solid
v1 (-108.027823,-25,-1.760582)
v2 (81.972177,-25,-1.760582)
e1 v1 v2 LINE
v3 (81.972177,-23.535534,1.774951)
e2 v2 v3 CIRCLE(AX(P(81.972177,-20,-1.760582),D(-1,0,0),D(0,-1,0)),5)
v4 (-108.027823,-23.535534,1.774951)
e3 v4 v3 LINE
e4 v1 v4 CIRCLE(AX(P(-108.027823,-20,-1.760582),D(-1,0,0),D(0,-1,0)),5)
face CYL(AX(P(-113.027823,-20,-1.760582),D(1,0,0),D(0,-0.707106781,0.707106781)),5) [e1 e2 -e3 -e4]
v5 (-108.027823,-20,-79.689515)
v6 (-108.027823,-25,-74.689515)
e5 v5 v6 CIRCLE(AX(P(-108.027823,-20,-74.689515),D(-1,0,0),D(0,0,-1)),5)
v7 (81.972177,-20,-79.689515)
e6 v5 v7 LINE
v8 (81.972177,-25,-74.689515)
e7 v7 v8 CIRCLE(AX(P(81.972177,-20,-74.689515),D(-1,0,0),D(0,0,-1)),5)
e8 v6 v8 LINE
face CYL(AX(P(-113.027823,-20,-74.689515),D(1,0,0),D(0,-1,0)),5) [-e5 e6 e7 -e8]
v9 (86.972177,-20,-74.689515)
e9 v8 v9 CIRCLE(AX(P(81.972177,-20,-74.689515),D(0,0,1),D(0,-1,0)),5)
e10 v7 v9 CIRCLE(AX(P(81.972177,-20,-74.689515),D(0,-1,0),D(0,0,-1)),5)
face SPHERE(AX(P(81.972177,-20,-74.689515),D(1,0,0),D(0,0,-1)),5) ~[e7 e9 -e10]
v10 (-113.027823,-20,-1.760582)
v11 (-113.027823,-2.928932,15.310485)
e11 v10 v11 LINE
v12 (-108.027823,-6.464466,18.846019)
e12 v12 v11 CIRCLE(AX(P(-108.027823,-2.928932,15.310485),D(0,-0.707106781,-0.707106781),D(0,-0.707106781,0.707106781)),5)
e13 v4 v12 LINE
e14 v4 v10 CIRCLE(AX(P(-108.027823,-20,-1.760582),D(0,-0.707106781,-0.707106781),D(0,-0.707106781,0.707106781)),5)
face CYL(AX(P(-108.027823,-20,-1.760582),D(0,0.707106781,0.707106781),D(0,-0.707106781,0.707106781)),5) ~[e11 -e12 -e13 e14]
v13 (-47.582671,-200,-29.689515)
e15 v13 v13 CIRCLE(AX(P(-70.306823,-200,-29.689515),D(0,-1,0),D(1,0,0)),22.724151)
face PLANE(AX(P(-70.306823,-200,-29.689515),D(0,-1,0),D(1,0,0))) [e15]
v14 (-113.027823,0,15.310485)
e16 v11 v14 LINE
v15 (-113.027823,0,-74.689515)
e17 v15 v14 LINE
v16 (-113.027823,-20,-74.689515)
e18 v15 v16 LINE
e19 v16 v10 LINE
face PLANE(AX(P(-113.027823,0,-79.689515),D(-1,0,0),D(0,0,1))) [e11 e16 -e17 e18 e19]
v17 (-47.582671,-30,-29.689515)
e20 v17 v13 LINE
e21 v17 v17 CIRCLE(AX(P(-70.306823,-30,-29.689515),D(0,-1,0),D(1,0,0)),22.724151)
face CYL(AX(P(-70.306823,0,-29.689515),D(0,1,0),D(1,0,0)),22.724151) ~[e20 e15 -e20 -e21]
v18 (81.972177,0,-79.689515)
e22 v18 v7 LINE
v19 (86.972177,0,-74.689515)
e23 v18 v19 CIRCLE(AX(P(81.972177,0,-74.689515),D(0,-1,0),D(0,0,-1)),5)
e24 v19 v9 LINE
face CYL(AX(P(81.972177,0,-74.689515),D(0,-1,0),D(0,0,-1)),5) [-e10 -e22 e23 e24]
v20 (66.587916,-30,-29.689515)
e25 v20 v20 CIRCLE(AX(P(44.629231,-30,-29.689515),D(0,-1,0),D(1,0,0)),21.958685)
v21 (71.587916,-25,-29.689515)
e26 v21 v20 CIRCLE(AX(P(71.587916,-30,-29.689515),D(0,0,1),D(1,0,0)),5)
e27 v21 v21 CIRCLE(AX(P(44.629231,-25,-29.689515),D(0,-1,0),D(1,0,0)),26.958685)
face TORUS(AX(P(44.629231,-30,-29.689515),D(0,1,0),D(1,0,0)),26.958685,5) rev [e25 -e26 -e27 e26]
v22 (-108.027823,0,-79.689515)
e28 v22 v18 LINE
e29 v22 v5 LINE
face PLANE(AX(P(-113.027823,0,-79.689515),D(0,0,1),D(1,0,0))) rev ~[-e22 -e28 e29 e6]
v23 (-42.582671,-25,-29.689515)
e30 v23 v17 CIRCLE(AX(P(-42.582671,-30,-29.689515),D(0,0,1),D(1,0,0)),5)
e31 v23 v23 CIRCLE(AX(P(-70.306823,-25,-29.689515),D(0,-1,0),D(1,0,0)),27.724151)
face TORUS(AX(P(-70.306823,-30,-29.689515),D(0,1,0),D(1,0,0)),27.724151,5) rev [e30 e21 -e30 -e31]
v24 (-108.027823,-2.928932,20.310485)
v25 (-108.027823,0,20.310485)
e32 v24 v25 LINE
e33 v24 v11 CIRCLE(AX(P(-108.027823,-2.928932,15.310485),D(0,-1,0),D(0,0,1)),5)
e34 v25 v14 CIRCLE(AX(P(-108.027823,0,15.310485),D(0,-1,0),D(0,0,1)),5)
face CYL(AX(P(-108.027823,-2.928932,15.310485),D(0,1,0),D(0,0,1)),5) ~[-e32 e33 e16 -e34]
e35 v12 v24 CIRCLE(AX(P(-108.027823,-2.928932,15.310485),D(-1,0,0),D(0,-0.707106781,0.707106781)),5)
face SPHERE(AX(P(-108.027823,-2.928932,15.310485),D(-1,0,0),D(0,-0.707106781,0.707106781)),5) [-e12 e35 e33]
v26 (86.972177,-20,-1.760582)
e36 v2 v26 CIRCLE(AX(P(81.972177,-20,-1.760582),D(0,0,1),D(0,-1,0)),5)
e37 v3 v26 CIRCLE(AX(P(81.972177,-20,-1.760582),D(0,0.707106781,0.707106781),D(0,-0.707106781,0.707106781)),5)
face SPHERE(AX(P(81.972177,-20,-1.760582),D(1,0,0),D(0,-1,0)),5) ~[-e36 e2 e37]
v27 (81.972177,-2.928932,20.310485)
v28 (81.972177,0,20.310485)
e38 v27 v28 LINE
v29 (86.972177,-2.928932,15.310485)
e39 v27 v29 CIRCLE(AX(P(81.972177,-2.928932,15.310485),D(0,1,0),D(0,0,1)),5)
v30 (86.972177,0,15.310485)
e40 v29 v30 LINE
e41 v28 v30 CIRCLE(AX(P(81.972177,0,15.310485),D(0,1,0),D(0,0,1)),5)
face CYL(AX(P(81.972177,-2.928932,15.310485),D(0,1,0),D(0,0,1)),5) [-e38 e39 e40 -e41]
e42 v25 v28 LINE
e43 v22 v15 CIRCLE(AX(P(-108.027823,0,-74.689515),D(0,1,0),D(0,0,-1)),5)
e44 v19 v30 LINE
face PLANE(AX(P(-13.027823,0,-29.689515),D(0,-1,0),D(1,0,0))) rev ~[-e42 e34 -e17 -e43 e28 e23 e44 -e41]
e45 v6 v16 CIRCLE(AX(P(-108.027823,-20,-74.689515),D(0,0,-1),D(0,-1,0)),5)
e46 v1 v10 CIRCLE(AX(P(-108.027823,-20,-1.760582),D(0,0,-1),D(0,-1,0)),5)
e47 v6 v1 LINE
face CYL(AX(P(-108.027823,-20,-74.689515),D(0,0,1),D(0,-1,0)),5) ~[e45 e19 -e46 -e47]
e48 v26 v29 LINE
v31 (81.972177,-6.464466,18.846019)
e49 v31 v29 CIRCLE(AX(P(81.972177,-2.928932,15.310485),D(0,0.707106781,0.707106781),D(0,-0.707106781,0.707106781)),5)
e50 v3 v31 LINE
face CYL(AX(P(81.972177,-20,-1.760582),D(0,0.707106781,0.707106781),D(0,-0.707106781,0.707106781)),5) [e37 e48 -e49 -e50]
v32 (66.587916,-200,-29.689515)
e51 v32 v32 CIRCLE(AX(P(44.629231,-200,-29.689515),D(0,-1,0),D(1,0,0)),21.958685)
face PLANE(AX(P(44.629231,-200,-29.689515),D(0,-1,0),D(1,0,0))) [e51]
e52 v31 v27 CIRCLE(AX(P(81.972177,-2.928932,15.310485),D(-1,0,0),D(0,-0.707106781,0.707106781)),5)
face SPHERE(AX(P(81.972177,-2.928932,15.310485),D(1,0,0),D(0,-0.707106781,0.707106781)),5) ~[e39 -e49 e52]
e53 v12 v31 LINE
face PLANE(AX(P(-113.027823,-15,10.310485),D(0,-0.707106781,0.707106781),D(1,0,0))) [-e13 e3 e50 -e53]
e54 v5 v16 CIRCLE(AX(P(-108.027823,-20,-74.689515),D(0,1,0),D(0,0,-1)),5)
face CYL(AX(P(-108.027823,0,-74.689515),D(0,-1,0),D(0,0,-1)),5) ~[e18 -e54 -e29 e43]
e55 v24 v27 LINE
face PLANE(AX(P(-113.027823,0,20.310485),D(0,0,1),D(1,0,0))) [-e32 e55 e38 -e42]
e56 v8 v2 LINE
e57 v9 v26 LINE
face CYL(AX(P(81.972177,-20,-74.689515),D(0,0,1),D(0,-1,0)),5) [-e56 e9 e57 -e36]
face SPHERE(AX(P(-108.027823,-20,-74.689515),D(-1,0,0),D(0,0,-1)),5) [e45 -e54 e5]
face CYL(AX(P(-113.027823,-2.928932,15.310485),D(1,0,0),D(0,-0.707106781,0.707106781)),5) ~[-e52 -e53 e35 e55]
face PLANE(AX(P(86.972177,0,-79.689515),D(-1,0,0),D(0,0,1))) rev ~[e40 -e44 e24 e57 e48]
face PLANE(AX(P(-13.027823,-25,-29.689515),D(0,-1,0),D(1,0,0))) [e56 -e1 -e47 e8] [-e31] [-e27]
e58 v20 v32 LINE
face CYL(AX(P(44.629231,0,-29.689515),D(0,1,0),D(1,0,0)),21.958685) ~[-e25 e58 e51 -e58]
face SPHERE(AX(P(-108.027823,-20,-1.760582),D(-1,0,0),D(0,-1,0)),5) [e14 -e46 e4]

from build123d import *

# Parameters (mm, degrees)
F0_W     = 200
F0_H     = 100
F0_R     = 22.7241513298
F0_R_2   = 21.9586845422
F1_DEPTH = 25
F2_DEPTH = 200
F3_SIZE  = 20
F4_F1_R  = 5
F4_F2_R  = 5
F4_F3_R  = 5
F4_F4_R  = 5
F4_F5_R  = 5
F4_F6_R  = 5
F4_F7_R  = 5


# Not quite as in the source:
# - a feature of the source that left no trace in its solid (it failed there, or was rolled back) is left out


with BuildPart() as f1:
    # F0 (on Front) → F1 (new body)
    with BuildSketch(Plane.XZ):
        with Locations((-13.0278225988, -29.689514604)):
            Rectangle(F0_W, F0_H)
        with Locations((-70.3068226576, -29.689514604)):
            Circle(F0_R, mode=Mode.SUBTRACT)
        with Locations((44.6292310953, -29.689514604)):
            Circle(F0_R_2, mode=Mode.SUBTRACT)
    extrude(amount=F1_DEPTH)

    # F0 (on Front) → F2 (join)
    with BuildSketch(Plane.XZ):
        with Locations((44.6292310953, -29.689514604)):
            Circle(F0_R_2)
        with Locations((-70.3068226576, -29.689514604)):
            Circle(F0_R)
    extrude(amount=F2_DEPTH)

    # F3
    f3_edges = [f1.edges().sort_by_distance(p)[0] for p in [
        (-13.027823, -25, 20.310485),
    ]]
    chamfer(f3_edges, length=F3_SIZE)

    # F4: fillet of radius 5 on 11 edges, made by hand

    # F4_f1
    f4_f1_edges = [f1.edges().sort_by_distance(p)[0] for p in [
        (-13.0278225988, -5, 20.310485396),
    ]]
    fillet(f4_f1_edges, radius=F4_F1_R)

    # F4_f2
    f4_f2_edges = [f1.edges().sort_by_distance(p)[0] for p in [
        (-13.0278225988, -25, 0.310485396),
    ]]
    fillet(f4_f2_edges, radius=F4_F2_R)

    # F4_f3
    f4_f3_edges = [f1.edges().sort_by_distance(p)[0] for p in [
        (-13.0278225988, -25, -79.689514604),
    ]]
    fillet(f4_f3_edges, radius=F4_F3_R)

    # F4_f4
    f4_f4_edges = [f1.edges().sort_by_distance(p)[0] for p in [
        (-93.0309739873, -25, -29.689514604),
    ]]
    fillet(f4_f4_edges, radius=F4_F4_R)

    # F4_f5
    f4_f5_edges = [f1.edges().sort_by_distance(p)[0] for p in [
        (22.6705465531, -25, -29.689514604),
    ]]
    fillet(f4_f5_edges, radius=F4_F5_R)

    # F4_f6
    f4_f6_edges = [f1.edges().sort_by_distance(p)[0] for p in [
        (86.9721774012, -25, -38.2250485099),
    ]]
    fillet(f4_f6_edges, radius=F4_F6_R)

    # F4_f7
    f4_f7_edges = [f1.edges().sort_by_distance(p)[0] for p in [
        (-113.0278225988, -25, -38.2250485099),
    ]]
    fillet(f4_f7_edges, radius=F4_F7_R)


solid = f1.part
